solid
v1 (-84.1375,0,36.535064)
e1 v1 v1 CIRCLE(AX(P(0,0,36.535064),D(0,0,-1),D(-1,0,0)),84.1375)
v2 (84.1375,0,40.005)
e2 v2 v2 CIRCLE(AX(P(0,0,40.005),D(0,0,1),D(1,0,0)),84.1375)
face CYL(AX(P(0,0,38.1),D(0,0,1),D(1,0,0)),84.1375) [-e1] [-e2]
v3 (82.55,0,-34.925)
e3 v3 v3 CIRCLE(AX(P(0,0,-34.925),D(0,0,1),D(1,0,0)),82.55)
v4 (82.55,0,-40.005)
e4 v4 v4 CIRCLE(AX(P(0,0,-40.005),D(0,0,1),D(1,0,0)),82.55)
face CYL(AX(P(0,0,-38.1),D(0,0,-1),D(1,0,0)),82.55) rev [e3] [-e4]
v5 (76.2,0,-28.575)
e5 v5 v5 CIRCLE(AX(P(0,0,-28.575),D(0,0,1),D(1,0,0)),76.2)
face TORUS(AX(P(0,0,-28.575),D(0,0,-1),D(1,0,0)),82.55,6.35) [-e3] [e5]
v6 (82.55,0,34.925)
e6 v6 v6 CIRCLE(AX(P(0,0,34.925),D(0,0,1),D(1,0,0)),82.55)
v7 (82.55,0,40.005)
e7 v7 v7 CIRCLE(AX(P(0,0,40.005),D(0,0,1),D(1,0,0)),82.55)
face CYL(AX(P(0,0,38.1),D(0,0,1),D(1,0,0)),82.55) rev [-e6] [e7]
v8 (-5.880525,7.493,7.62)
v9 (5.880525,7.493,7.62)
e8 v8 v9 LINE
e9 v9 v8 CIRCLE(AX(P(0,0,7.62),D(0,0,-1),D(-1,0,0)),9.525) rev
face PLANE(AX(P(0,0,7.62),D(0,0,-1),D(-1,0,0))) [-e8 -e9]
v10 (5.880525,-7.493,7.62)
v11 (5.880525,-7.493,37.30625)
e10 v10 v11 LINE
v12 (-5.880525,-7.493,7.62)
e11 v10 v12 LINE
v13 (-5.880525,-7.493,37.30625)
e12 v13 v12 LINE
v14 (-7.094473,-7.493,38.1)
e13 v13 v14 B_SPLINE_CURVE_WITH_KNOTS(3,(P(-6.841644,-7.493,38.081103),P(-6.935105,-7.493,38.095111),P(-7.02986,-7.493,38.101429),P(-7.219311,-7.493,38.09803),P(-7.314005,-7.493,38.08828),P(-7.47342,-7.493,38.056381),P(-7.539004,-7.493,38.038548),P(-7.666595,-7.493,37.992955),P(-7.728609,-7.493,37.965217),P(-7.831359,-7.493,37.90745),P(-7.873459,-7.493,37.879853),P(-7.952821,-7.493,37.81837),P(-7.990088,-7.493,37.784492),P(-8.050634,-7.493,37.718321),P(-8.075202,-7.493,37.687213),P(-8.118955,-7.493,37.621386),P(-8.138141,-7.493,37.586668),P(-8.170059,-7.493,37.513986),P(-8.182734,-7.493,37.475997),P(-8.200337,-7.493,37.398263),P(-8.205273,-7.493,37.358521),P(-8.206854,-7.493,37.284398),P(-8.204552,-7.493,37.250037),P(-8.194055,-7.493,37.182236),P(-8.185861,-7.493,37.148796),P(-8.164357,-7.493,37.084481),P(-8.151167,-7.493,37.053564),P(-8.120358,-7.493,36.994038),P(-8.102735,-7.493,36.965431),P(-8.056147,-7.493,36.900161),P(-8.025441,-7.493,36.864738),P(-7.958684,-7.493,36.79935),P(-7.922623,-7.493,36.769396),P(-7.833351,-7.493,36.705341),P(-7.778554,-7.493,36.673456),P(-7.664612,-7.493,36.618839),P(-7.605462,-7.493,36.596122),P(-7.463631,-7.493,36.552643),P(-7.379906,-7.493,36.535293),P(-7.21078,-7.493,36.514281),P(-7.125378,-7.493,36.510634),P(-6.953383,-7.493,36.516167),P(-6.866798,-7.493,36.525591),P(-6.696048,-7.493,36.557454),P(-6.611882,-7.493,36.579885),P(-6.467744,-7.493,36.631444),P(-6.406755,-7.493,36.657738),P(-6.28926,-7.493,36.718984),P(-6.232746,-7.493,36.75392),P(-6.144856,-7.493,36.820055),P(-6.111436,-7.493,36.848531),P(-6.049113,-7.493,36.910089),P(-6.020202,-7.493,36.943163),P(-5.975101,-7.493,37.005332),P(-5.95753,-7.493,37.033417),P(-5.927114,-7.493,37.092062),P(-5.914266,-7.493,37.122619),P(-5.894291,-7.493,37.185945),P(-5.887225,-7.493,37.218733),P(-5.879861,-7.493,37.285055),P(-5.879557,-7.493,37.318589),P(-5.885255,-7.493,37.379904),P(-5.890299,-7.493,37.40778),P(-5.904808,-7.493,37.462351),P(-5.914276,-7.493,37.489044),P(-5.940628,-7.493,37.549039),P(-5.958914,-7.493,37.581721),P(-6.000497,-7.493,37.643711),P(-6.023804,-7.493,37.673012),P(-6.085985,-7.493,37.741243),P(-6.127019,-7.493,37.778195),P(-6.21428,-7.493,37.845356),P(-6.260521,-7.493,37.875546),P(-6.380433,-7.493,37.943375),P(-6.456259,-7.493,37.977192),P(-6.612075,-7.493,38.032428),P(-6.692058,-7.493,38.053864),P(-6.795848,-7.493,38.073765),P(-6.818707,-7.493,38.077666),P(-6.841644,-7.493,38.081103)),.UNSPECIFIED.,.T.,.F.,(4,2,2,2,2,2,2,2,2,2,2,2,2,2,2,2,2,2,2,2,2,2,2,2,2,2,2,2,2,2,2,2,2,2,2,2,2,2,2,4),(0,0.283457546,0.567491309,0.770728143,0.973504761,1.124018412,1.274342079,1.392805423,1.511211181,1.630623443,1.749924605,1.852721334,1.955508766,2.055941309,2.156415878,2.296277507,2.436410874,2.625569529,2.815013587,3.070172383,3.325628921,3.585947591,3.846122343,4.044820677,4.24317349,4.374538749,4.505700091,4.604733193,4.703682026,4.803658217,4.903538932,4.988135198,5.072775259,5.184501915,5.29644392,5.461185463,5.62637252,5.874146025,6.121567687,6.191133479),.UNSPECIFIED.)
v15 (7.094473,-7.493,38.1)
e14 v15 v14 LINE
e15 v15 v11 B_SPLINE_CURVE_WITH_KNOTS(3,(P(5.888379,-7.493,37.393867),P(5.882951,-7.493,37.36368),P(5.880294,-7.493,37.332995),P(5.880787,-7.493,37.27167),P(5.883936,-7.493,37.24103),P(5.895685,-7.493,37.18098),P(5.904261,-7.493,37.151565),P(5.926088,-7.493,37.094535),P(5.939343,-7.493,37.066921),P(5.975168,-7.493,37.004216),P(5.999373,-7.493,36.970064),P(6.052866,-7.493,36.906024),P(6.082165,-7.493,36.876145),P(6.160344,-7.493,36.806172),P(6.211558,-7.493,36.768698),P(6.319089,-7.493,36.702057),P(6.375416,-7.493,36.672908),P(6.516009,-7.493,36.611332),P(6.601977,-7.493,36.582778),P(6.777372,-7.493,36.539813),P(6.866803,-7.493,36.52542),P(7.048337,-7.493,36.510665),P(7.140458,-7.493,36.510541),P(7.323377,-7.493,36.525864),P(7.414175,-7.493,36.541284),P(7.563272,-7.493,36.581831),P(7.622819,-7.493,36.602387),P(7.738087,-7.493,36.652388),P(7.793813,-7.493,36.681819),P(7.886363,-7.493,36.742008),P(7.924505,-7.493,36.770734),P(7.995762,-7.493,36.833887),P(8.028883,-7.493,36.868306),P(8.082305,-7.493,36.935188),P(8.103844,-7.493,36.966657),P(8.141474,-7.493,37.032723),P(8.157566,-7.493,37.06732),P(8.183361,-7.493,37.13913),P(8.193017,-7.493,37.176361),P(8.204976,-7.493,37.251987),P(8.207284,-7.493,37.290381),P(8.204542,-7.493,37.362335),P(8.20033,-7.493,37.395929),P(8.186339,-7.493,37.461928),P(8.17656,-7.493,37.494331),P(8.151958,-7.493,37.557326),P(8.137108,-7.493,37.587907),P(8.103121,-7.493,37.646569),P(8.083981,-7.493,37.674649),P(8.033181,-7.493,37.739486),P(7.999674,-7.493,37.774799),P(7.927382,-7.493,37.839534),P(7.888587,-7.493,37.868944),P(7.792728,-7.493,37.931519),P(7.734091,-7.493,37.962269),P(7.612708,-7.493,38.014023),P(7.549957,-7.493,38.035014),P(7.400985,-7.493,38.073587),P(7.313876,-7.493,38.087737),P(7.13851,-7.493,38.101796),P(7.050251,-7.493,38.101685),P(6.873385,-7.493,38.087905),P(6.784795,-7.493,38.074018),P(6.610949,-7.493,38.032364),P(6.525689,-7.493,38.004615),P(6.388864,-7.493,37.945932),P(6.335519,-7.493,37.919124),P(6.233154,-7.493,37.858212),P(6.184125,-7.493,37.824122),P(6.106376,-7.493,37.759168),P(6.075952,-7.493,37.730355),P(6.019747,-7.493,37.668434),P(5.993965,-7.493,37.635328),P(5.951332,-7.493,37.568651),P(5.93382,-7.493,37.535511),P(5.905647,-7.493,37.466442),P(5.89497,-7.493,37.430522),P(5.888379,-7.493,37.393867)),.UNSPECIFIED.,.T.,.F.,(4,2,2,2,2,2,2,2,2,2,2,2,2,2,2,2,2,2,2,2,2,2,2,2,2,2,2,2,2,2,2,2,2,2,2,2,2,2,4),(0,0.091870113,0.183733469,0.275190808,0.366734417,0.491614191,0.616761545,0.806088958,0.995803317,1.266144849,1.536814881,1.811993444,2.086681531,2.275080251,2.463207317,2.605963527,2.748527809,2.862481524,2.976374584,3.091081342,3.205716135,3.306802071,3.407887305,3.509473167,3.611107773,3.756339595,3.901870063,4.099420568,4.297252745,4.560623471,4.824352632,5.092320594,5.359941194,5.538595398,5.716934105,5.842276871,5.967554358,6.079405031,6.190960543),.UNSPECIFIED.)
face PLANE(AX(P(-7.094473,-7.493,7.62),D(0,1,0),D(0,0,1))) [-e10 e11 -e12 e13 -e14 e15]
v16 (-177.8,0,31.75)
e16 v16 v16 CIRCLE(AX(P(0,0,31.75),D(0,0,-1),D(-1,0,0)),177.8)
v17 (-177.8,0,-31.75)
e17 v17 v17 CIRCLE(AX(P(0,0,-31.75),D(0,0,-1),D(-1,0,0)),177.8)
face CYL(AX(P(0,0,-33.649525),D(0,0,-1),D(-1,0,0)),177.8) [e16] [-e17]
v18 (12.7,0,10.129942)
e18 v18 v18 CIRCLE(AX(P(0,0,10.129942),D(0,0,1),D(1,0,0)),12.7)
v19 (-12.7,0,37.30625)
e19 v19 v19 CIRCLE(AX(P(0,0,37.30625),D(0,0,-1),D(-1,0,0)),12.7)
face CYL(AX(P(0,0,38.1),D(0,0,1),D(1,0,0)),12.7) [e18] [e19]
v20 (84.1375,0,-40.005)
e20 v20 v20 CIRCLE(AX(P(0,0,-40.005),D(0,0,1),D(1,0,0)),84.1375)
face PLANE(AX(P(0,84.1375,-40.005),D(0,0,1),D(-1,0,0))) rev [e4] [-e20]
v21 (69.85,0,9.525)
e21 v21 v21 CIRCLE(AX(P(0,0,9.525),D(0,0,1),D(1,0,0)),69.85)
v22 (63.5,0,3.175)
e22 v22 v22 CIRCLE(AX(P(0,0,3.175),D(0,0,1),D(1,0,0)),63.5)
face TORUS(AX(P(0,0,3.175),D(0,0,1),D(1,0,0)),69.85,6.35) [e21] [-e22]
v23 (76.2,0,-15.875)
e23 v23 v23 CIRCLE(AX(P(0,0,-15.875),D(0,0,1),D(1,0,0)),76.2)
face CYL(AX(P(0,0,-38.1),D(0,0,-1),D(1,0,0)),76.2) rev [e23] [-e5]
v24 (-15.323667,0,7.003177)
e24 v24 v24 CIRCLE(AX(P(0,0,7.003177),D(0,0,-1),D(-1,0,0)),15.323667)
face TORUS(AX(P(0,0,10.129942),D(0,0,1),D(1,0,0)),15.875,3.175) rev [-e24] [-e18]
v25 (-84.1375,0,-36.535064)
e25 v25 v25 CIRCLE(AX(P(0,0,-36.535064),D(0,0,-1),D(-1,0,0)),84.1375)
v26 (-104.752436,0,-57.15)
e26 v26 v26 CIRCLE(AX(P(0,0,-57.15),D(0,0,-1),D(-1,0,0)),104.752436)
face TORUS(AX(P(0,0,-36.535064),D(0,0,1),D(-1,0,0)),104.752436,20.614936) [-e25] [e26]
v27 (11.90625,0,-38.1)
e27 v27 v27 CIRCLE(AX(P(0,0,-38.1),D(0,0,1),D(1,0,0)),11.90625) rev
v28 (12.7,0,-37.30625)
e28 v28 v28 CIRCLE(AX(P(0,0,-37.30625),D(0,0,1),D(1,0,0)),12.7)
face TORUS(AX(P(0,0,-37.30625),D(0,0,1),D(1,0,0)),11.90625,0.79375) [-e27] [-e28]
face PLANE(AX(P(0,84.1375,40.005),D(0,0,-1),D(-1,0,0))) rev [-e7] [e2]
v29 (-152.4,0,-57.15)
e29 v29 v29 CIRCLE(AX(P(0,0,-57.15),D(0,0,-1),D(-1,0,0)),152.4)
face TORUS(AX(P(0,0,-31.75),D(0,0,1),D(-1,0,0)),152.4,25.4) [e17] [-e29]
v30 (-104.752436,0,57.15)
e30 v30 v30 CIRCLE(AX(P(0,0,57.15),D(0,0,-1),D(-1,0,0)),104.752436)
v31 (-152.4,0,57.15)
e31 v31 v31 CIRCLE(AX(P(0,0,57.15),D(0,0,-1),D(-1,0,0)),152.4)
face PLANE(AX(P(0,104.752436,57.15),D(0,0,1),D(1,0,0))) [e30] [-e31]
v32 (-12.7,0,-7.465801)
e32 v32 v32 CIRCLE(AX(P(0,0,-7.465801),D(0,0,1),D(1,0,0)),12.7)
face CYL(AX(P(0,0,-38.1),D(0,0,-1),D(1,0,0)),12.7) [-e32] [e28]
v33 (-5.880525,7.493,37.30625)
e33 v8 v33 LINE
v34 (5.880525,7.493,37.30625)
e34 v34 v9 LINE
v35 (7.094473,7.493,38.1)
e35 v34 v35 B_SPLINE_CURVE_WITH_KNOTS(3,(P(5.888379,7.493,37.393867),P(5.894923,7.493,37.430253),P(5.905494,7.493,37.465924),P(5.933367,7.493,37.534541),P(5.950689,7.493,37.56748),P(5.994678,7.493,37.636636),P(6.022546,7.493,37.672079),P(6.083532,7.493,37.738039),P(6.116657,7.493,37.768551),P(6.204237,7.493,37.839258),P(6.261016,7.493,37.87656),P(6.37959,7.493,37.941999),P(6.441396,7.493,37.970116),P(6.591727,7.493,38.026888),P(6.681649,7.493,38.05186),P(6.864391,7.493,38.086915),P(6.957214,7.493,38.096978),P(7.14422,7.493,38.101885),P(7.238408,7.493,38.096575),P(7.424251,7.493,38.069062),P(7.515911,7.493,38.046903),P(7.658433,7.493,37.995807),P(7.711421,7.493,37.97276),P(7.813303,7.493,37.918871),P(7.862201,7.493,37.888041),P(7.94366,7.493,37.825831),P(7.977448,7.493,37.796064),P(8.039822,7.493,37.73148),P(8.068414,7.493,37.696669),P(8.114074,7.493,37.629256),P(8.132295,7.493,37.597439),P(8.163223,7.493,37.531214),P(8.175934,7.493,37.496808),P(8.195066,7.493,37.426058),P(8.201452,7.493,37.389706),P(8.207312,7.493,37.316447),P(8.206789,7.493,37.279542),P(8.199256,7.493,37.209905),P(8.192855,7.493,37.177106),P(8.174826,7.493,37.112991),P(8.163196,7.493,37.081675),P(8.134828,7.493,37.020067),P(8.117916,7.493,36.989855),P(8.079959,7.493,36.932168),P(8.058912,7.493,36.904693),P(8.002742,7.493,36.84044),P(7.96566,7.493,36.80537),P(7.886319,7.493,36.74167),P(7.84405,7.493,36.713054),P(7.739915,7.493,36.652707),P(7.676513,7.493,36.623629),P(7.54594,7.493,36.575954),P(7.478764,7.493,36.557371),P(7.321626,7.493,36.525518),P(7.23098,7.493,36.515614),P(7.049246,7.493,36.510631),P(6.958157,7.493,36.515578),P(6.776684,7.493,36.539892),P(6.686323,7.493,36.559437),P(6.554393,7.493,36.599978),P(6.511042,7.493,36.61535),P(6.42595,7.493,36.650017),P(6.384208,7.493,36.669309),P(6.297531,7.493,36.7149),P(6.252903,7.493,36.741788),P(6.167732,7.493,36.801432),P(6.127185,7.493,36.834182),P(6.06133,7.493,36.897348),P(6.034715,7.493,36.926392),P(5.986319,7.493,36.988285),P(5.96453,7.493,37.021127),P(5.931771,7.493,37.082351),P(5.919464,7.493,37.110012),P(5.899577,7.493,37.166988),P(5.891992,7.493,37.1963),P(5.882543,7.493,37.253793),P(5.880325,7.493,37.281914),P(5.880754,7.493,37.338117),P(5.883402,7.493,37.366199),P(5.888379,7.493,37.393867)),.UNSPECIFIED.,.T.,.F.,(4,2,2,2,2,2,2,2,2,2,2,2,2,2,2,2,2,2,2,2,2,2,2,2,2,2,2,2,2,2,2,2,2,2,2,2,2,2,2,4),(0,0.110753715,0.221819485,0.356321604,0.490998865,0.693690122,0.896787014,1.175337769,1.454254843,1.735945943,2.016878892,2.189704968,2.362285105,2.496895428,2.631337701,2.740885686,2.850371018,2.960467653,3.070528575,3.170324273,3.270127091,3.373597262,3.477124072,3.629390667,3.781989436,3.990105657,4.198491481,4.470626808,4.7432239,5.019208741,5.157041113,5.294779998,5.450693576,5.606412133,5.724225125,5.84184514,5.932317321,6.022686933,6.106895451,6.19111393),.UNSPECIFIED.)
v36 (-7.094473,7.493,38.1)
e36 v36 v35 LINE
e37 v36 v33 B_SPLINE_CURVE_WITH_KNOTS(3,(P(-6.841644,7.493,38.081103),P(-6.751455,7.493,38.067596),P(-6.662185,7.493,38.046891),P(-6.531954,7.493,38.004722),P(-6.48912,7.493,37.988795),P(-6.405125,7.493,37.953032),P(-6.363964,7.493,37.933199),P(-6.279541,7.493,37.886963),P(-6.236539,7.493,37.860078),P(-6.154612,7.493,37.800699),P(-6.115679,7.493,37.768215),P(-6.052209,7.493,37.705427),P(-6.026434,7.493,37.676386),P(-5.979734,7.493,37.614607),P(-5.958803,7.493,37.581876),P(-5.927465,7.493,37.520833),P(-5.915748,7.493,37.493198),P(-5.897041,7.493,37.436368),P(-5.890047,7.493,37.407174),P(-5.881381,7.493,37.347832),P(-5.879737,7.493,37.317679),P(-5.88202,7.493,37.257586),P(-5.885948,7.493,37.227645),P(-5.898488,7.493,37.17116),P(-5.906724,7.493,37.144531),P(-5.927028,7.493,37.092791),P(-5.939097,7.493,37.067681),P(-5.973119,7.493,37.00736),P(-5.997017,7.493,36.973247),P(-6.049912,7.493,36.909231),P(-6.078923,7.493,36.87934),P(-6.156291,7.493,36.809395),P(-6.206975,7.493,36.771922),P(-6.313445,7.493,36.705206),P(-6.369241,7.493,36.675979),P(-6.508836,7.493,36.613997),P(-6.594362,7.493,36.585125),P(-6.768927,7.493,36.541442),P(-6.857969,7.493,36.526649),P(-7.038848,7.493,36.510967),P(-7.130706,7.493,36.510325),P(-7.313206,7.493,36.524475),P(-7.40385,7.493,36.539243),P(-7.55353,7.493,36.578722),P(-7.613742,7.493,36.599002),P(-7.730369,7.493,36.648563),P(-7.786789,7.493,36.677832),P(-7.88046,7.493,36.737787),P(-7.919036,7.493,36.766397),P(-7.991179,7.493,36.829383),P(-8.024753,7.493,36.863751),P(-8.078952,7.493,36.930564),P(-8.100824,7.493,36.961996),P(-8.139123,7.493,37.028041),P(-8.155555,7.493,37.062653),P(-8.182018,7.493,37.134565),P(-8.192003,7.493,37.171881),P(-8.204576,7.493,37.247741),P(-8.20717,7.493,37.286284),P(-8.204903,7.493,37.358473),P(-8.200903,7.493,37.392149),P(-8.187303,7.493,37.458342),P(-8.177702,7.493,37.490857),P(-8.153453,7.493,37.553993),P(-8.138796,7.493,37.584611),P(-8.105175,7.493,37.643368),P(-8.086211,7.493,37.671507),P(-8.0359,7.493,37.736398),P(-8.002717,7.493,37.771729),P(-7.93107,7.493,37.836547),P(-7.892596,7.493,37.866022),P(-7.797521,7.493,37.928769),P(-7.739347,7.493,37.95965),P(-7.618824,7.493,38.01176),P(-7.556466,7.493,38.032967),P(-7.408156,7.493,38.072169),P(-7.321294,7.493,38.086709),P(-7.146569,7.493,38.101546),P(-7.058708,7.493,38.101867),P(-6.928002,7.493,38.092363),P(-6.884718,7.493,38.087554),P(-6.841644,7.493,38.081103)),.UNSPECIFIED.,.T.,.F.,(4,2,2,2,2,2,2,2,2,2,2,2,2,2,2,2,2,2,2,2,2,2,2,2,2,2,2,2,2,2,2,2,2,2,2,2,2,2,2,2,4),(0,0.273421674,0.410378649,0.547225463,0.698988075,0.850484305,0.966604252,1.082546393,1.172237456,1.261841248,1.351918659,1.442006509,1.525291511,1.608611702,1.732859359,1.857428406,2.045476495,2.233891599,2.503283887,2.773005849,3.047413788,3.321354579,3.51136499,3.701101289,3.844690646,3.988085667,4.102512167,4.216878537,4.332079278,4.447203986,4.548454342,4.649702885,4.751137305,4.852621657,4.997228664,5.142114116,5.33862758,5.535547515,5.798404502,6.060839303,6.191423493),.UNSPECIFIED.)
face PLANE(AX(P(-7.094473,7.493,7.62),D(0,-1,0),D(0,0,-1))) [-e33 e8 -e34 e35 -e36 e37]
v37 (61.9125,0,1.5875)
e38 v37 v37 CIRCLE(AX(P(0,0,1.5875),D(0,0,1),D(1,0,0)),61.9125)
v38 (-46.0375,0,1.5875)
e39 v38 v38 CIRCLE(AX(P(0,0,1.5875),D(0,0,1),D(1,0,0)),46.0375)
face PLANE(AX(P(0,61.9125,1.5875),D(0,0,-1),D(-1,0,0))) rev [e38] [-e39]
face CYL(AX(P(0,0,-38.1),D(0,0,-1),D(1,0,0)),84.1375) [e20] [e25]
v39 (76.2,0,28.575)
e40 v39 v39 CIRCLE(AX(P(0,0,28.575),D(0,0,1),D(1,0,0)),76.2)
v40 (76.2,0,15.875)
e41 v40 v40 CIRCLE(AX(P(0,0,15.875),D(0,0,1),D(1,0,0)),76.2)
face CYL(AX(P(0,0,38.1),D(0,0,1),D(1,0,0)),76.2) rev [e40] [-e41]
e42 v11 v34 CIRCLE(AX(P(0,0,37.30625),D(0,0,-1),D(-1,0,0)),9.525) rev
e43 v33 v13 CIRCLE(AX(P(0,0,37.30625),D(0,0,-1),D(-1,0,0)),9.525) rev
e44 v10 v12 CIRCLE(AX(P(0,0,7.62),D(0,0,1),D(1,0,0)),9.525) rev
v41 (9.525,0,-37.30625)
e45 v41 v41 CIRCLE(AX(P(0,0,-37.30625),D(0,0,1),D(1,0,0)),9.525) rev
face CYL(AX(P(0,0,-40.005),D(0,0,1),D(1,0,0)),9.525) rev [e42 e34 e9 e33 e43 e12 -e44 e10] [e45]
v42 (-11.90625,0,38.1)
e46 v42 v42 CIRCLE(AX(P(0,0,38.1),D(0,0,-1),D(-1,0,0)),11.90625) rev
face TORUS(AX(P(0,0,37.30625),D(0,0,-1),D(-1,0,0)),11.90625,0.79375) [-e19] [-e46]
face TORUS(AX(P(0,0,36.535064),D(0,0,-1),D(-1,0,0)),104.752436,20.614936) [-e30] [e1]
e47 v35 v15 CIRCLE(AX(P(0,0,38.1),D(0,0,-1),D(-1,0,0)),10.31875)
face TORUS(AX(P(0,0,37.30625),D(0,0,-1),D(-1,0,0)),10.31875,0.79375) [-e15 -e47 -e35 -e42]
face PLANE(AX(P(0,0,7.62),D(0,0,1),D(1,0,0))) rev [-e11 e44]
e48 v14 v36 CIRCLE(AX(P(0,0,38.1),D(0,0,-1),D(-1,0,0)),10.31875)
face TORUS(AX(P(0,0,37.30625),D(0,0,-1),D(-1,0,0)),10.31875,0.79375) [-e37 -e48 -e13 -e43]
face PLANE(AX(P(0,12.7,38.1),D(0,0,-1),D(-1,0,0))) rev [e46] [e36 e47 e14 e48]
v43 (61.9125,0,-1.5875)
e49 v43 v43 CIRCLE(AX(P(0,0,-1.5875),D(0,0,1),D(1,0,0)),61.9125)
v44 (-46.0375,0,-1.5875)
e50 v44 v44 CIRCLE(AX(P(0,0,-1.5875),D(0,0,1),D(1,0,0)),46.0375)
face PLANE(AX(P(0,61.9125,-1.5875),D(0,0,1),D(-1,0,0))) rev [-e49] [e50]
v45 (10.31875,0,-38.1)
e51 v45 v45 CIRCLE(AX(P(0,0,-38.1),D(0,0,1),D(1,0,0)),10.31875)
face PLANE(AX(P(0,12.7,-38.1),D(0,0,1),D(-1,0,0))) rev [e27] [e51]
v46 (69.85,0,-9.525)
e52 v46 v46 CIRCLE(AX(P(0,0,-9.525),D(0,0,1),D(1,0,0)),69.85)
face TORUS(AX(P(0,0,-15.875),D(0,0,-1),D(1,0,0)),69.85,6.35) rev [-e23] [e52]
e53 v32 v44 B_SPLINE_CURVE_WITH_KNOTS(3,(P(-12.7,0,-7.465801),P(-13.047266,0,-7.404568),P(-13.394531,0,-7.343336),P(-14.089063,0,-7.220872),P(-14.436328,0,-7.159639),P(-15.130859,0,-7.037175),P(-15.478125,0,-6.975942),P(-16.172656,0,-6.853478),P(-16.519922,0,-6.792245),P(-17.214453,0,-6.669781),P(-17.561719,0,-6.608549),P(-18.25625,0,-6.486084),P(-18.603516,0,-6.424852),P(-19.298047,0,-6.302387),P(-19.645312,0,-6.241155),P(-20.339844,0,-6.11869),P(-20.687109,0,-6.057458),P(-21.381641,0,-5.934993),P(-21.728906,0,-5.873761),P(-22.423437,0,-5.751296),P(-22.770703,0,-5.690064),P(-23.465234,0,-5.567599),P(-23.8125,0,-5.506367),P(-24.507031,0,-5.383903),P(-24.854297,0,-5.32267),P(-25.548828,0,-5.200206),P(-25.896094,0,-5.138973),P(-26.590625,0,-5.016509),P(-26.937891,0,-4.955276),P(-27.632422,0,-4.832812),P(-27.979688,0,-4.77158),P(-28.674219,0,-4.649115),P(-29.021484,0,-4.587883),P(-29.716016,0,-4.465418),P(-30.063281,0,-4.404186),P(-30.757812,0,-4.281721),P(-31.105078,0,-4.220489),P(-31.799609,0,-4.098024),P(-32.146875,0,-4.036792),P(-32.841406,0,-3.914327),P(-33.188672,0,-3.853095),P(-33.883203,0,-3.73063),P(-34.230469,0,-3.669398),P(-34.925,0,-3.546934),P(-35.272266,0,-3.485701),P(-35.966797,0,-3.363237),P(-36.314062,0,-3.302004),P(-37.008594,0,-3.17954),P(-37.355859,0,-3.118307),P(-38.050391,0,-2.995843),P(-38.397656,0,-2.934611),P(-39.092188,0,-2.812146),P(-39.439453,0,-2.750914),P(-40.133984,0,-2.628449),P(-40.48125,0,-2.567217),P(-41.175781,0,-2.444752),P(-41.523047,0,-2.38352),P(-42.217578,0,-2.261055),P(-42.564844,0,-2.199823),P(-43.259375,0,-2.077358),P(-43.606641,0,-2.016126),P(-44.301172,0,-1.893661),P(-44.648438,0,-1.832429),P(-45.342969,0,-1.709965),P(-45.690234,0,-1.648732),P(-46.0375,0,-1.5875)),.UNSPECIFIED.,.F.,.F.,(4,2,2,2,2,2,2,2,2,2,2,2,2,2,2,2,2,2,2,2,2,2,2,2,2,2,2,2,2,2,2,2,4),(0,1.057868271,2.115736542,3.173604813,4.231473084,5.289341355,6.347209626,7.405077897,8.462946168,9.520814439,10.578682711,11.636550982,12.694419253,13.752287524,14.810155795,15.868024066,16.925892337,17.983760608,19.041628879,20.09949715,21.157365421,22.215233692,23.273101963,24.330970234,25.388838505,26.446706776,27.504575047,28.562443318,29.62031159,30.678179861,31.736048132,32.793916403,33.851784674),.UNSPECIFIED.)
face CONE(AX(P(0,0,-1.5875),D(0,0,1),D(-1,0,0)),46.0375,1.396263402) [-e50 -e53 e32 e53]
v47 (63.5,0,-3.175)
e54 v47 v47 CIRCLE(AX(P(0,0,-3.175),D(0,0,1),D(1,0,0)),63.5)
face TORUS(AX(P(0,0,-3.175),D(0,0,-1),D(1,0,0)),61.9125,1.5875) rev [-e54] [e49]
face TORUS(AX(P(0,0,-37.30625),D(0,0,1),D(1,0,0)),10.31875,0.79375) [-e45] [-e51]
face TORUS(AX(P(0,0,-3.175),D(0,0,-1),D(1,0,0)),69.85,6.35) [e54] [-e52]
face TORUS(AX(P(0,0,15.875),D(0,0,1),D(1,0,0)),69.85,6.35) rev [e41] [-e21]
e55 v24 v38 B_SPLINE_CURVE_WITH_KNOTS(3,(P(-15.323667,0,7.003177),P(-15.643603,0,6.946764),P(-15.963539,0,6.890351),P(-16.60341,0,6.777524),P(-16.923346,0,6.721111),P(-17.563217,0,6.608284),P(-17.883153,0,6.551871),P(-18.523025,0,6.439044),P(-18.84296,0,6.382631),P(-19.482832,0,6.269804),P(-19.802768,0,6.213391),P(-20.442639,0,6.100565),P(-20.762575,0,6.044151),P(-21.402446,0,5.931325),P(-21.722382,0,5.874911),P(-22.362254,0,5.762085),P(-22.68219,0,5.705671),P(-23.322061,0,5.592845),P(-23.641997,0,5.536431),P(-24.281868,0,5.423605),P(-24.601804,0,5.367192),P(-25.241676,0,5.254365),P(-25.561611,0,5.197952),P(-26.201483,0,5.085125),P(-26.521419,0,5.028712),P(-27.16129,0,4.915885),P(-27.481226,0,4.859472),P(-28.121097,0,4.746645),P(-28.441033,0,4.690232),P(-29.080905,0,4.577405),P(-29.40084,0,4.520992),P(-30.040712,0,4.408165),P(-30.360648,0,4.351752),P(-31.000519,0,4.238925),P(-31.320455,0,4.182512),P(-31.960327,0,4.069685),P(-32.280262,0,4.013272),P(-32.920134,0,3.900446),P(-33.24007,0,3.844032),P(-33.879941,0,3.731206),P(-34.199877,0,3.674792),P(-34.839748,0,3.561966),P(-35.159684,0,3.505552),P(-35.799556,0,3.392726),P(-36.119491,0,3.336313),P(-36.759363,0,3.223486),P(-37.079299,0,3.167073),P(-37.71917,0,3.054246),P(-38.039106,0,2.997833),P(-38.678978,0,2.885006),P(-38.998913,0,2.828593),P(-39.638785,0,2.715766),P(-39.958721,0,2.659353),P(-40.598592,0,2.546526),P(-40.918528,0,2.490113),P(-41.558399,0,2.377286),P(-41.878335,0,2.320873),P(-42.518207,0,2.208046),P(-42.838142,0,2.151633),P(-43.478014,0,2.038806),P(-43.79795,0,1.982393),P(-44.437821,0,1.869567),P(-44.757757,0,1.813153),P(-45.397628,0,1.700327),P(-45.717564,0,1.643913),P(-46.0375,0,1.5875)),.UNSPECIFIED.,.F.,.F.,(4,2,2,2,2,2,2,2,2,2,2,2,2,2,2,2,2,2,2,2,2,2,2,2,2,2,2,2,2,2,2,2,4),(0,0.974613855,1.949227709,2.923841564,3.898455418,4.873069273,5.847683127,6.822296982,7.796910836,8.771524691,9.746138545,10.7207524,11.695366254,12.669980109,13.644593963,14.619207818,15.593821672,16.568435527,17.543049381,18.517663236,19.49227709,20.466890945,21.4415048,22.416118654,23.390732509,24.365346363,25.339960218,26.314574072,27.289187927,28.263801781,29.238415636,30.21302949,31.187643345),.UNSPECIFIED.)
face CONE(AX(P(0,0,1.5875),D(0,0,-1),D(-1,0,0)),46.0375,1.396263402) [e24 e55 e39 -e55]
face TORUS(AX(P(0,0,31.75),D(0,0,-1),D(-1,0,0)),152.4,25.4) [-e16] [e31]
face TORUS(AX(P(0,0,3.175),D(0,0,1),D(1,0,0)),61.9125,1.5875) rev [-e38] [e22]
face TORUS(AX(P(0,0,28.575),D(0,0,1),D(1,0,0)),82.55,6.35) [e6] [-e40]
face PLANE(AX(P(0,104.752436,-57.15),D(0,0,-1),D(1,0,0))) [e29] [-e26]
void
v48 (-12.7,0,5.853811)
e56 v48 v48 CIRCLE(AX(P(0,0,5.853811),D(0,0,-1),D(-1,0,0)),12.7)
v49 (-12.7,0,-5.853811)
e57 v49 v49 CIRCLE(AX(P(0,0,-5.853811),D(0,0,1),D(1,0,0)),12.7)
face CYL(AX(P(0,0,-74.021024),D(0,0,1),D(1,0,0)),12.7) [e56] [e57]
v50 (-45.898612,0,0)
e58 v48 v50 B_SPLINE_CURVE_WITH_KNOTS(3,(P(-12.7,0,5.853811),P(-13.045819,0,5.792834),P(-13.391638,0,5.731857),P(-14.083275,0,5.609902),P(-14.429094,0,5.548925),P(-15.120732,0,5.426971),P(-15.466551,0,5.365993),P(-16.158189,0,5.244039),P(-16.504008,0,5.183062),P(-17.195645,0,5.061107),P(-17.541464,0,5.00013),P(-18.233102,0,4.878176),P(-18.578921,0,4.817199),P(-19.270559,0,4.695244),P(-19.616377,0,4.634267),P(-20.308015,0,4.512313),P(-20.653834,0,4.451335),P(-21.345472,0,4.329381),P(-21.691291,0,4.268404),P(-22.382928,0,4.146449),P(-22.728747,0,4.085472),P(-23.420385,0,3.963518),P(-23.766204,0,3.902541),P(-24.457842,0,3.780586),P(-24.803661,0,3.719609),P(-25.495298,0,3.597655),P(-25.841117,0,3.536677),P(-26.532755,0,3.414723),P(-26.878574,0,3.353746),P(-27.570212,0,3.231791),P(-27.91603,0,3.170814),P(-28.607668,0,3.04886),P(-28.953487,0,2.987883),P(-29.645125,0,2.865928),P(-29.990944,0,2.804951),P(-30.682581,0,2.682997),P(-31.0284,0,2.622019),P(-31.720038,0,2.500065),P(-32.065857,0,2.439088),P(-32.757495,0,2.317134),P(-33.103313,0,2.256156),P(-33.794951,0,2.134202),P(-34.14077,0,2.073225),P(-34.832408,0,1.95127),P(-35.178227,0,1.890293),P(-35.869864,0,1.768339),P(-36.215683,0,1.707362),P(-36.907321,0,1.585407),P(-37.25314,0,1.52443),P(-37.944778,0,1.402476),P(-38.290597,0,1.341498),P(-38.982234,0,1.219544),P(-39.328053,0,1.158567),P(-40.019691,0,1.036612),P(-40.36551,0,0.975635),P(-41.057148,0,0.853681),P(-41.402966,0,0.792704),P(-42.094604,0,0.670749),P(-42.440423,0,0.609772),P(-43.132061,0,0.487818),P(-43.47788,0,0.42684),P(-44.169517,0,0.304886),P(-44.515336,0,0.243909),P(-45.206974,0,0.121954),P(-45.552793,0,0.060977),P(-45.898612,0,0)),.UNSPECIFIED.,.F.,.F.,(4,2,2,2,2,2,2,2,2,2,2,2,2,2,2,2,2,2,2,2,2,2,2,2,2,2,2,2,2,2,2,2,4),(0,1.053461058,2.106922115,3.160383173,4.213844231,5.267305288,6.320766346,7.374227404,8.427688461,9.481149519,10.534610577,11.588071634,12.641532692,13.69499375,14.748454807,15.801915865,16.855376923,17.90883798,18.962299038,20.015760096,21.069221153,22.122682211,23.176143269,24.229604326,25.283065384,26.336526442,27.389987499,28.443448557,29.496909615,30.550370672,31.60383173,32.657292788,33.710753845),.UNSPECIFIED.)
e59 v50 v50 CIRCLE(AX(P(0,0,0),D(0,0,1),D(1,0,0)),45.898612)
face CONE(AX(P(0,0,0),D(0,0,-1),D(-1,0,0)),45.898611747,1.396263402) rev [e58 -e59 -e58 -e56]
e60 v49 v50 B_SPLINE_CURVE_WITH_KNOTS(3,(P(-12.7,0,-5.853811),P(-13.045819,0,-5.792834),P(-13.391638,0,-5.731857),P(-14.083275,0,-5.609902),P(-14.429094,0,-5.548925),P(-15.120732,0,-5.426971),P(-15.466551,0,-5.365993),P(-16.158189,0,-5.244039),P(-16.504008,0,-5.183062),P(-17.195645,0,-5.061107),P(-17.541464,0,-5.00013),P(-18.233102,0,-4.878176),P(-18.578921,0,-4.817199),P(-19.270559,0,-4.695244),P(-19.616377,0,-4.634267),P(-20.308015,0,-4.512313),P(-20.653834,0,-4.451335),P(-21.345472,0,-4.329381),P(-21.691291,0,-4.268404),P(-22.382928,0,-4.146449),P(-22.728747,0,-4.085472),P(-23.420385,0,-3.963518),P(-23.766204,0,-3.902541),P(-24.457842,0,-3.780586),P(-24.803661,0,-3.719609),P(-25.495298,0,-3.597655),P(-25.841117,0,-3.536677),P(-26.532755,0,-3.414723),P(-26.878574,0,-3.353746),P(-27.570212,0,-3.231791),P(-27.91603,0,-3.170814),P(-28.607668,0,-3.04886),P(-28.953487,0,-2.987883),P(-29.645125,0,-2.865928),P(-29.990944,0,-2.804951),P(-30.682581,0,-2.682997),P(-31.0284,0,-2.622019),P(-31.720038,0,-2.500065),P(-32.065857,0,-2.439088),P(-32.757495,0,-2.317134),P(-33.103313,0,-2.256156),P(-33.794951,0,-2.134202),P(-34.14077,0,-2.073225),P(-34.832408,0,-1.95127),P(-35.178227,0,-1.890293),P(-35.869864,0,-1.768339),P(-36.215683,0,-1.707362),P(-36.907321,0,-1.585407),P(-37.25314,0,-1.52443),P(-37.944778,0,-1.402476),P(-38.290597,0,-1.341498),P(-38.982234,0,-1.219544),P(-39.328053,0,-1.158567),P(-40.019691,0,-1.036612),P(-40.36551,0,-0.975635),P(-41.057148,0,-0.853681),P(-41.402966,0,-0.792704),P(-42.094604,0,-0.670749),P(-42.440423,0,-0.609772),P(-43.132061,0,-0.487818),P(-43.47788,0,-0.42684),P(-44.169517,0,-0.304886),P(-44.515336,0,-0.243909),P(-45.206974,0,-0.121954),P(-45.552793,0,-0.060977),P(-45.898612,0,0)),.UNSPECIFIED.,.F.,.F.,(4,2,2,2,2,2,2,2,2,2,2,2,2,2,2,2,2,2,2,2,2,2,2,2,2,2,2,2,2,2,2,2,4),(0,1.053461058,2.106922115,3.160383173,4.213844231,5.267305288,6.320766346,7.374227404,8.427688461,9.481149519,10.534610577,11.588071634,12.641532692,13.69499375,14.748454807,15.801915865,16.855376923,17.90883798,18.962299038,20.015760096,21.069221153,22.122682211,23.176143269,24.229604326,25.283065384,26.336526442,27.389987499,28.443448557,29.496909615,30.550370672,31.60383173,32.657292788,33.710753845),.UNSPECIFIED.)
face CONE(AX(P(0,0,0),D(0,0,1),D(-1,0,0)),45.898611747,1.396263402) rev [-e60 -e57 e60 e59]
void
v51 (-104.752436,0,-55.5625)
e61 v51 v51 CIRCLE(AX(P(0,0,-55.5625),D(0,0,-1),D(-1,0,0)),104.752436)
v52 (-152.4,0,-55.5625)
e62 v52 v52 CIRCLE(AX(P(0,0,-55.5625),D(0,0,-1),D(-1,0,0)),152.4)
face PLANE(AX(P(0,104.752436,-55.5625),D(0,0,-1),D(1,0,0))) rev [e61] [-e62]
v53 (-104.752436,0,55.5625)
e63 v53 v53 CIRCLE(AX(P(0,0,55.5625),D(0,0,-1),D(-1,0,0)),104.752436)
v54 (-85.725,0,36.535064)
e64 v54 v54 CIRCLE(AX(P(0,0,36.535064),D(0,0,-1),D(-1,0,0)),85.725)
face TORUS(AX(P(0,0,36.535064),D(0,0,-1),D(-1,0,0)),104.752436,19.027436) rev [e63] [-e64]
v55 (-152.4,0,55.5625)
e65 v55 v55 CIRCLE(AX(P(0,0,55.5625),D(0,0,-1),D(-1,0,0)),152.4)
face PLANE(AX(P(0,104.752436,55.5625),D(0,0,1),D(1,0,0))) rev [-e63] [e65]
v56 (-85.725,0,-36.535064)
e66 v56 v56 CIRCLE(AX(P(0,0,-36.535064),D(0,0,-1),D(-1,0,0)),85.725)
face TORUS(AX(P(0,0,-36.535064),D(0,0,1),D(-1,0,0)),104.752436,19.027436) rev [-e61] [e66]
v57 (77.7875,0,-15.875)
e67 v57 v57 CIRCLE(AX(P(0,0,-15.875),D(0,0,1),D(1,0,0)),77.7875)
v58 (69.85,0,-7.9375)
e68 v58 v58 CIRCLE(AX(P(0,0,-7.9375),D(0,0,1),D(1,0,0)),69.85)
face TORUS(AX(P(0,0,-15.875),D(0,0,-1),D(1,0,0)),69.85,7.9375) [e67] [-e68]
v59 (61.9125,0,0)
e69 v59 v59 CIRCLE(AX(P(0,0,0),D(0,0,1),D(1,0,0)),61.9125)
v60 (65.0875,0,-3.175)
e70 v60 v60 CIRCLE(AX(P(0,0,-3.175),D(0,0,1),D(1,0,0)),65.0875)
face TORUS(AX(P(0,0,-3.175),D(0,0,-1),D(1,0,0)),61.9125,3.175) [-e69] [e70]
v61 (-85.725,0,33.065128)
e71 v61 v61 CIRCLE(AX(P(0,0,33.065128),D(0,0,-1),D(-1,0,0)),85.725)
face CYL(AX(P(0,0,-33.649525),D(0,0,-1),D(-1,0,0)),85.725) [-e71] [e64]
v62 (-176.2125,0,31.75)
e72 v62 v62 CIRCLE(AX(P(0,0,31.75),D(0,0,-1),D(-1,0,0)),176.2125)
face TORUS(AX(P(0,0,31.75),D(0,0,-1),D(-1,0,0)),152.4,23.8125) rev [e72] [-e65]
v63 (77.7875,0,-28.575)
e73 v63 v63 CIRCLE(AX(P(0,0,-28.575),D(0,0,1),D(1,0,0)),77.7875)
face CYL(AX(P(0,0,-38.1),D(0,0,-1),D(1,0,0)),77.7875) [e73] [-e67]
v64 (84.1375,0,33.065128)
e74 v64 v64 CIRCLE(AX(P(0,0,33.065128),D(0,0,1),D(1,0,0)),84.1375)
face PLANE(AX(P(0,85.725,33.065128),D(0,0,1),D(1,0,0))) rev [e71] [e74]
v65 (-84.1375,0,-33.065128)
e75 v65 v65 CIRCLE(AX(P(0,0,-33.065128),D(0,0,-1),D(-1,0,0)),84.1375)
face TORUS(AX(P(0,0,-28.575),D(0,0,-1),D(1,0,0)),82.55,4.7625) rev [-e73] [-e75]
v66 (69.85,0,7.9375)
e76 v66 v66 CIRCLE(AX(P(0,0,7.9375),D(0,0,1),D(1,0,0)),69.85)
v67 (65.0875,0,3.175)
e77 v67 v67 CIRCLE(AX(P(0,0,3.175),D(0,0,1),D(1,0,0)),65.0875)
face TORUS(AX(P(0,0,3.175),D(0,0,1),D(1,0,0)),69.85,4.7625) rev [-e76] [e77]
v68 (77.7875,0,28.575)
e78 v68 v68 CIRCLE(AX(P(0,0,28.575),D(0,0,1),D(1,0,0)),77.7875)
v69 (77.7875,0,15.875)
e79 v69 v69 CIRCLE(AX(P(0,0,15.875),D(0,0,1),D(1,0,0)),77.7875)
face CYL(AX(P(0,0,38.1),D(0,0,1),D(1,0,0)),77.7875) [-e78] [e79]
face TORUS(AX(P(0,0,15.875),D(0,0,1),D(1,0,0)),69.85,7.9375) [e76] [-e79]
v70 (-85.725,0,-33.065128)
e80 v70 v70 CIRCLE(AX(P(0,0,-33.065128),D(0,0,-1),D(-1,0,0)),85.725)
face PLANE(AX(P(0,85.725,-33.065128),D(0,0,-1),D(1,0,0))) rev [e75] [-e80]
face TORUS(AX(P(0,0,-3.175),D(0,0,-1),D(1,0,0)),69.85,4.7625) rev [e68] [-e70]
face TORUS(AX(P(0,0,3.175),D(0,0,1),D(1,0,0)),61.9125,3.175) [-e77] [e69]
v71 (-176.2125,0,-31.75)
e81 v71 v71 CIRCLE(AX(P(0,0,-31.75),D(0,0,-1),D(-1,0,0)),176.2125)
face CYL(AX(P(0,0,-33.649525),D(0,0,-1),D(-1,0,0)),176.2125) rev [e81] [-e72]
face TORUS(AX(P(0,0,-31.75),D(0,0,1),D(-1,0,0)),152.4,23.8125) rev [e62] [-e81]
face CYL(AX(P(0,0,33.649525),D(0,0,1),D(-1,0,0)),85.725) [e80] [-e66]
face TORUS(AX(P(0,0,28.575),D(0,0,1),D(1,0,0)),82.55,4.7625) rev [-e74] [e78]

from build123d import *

# Parameters (mm, degrees)
SKETCH2_R      = 12.7
EXTRUDE1_DEPTH = 76.2
SKETCH3_R      = 9.525
EXTRUDE2_DEPTH = 143.332810123
FILLET1_R      = 3.175
FILLET2_R      = 0.79375
EXTRUDE3_DEPTH = 30.48


# Read off the part's stored shape, not the designer's step: Revolve-Thin1
with BuildPart() as part:
    # Revolve-Thin1 outline → Revolve-Thin1 (revolve)
    with BuildSketch(Plane.XZ):
        with BuildLine():
            Line((0, 38.1), (0, 36.5125))
            Line((0, 36.5125), (11.1125, 36.5125))
            Line((11.1125, 36.5125), (11.1125, 6.133730055))
            Line((11.1125, 6.133730055), (45.898611747, 0))
            Line((45.898611747, 0), (61.9125, 0))
            ThreePointArc((61.9125, 0), (64.15756403, 0.92993597), (65.0875, 3.175))
            ThreePointArc((65.0875, 3.175), (66.482403955, 6.542596045), (69.85, 7.9375))
            ThreePointArc((69.85, 7.9375), (75.462660076, 10.262339924), (77.7875, 15.875))
            Line((77.7875, 15.875), (77.7875, 28.575))
            ThreePointArc((77.7875, 28.575), (79.800369343, 32.463564967), (84.1375, 33.065128061))
            Line((84.1375, 33.065128061), (84.1375, 40.005))
            Line((84.1375, 40.005), (82.55, 40.005))
            Line((82.55, 40.005), (82.55, 34.925))
            ThreePointArc((82.55, 34.925), (78.059871939, 33.065128061), (76.2, 28.575))
            Line((76.2, 28.575), (76.2, 15.875))
            ThreePointArc((76.2, 15.875), (74.340128061, 11.384871939), (69.85, 9.525))
            ThreePointArc((69.85, 9.525), (65.359871939, 7.665128061), (63.5, 3.175))
            ThreePointArc((63.5, 3.175), (63.035032015, 2.052467985), (61.9125, 1.5875))
            Line((61.9125, 1.5875), (46.0375, 1.5875))
            Line((46.0375, 1.5875), (12.7, 7.465800719))
            Line((12.7, 7.465800719), (12.7, 38.1))
            Line((12.7, 38.1), (0, 38.1))
        make_face()
    revolve_thin1 = revolve(axis=Axis((0, 0, 0), (0, 0, 1)))

    # Mirror1: Revolve-Thin1 across plane
    add(revolve_thin1.mirror(Plane.XY))

    # Sketch2 → Extrude1 (add)
    with BuildSketch(Plane.XY.offset(38.1)):
        Circle(SKETCH2_R)
    extrude(amount=-EXTRUDE1_DEPTH)

    # Sketch3 → Extrude2 (cut, through all)
    with BuildSketch(Plane.XY.offset(38.1)):
        Circle(SKETCH3_R)
    extrude(amount=-EXTRUDE2_DEPTH, mode=Mode.SUBTRACT)

    # Fillet1
    fillet1_edges = [part.edges().sort_by_distance(p)[0] for p in [
        (-12.7, 0, 7.465800719),
    ]]
    fillet(fillet1_edges, radius=FILLET1_R)

    # Fillet2
    fillet2_edges = [part.edges().sort_by_distance(p)[0] for p in [
        (-12.7, 0, 38.1),
        (-12.7, 0, -38.1),
        (-9.525, 0, -38.1),
        (-9.525, 0, 38.1),
    ]]
    fillet(fillet2_edges, radius=FILLET2_R)

    # Sketch4 → Extrude3 (add)
    with BuildSketch(Plane.XY.offset(38.1)):
        with BuildLine():
            Line((-7.094473382, 7.493), (7.094473382, 7.493))
            ThreePointArc((7.094473382, 7.493), (0, 10.31875), (-7.094473382, 7.493))
        make_face()
        with BuildLine():
            Line((-7.094473382, -7.493), (7.094473382, -7.493))
            ThreePointArc((7.094473382, -7.493), (0, -10.31875), (-7.094473382, -7.493))
        make_face()
    extrude(amount=-EXTRUDE3_DEPTH)

    # Sketch5 → Revolve-Thin2 (revolve)
    with BuildSketch(Plane(origin=(0, 0, 0), x_dir=(0, 0, -1), z_dir=(1, 0, 0)), mode=Mode.PRIVATE) as revolve_thin2_sk:
        with BuildLine():
            Line((-33.065128061, 84.1375), (-36.53506403, 84.1375))
            ThreePointArc((-36.53506403, 84.1375), (-51.112025048, 90.175474952), (-57.15, 104.75243597))
            Line((-57.15, 104.75243597), (-57.15, 152.4))
            ThreePointArc((-57.15, 152.4), (-49.710512242, 170.360512242), (-31.75, 177.8))
            Line((-31.75, 177.8), (0, 177.8))
            Line((0, 177.8), (0, 176.2125))
            Line((0, 176.2125), (-31.75, 176.2125))
            ThreePointArc((-31.75, 176.2125), (-48.587980227, 169.237980227), (-55.5625, 152.4))
            Line((-55.5625, 152.4), (-55.5625, 104.75243597))
            ThreePointArc((-55.5625, 104.75243597), (-49.989493033, 91.298006967), (-36.53506403, 85.725))
            Line((-36.53506403, 85.725), (-33.065128061, 85.725))
            Line((-33.065128061, 85.725), (-33.065128061, 84.1375))
        make_face()
    revolve_thin2 = revolve(revolve_thin2_sk.sketch.rotate(Axis((0, 0, -33.649525455), (0, 0, 1)), 90), axis=Axis((0, 0, -33.649525455), (0, 0, 1)))

    # Mirror2: Revolve-Thin2 across Front Plane
    add(revolve_thin2.mirror(Plane.XY))


solid = part.part
